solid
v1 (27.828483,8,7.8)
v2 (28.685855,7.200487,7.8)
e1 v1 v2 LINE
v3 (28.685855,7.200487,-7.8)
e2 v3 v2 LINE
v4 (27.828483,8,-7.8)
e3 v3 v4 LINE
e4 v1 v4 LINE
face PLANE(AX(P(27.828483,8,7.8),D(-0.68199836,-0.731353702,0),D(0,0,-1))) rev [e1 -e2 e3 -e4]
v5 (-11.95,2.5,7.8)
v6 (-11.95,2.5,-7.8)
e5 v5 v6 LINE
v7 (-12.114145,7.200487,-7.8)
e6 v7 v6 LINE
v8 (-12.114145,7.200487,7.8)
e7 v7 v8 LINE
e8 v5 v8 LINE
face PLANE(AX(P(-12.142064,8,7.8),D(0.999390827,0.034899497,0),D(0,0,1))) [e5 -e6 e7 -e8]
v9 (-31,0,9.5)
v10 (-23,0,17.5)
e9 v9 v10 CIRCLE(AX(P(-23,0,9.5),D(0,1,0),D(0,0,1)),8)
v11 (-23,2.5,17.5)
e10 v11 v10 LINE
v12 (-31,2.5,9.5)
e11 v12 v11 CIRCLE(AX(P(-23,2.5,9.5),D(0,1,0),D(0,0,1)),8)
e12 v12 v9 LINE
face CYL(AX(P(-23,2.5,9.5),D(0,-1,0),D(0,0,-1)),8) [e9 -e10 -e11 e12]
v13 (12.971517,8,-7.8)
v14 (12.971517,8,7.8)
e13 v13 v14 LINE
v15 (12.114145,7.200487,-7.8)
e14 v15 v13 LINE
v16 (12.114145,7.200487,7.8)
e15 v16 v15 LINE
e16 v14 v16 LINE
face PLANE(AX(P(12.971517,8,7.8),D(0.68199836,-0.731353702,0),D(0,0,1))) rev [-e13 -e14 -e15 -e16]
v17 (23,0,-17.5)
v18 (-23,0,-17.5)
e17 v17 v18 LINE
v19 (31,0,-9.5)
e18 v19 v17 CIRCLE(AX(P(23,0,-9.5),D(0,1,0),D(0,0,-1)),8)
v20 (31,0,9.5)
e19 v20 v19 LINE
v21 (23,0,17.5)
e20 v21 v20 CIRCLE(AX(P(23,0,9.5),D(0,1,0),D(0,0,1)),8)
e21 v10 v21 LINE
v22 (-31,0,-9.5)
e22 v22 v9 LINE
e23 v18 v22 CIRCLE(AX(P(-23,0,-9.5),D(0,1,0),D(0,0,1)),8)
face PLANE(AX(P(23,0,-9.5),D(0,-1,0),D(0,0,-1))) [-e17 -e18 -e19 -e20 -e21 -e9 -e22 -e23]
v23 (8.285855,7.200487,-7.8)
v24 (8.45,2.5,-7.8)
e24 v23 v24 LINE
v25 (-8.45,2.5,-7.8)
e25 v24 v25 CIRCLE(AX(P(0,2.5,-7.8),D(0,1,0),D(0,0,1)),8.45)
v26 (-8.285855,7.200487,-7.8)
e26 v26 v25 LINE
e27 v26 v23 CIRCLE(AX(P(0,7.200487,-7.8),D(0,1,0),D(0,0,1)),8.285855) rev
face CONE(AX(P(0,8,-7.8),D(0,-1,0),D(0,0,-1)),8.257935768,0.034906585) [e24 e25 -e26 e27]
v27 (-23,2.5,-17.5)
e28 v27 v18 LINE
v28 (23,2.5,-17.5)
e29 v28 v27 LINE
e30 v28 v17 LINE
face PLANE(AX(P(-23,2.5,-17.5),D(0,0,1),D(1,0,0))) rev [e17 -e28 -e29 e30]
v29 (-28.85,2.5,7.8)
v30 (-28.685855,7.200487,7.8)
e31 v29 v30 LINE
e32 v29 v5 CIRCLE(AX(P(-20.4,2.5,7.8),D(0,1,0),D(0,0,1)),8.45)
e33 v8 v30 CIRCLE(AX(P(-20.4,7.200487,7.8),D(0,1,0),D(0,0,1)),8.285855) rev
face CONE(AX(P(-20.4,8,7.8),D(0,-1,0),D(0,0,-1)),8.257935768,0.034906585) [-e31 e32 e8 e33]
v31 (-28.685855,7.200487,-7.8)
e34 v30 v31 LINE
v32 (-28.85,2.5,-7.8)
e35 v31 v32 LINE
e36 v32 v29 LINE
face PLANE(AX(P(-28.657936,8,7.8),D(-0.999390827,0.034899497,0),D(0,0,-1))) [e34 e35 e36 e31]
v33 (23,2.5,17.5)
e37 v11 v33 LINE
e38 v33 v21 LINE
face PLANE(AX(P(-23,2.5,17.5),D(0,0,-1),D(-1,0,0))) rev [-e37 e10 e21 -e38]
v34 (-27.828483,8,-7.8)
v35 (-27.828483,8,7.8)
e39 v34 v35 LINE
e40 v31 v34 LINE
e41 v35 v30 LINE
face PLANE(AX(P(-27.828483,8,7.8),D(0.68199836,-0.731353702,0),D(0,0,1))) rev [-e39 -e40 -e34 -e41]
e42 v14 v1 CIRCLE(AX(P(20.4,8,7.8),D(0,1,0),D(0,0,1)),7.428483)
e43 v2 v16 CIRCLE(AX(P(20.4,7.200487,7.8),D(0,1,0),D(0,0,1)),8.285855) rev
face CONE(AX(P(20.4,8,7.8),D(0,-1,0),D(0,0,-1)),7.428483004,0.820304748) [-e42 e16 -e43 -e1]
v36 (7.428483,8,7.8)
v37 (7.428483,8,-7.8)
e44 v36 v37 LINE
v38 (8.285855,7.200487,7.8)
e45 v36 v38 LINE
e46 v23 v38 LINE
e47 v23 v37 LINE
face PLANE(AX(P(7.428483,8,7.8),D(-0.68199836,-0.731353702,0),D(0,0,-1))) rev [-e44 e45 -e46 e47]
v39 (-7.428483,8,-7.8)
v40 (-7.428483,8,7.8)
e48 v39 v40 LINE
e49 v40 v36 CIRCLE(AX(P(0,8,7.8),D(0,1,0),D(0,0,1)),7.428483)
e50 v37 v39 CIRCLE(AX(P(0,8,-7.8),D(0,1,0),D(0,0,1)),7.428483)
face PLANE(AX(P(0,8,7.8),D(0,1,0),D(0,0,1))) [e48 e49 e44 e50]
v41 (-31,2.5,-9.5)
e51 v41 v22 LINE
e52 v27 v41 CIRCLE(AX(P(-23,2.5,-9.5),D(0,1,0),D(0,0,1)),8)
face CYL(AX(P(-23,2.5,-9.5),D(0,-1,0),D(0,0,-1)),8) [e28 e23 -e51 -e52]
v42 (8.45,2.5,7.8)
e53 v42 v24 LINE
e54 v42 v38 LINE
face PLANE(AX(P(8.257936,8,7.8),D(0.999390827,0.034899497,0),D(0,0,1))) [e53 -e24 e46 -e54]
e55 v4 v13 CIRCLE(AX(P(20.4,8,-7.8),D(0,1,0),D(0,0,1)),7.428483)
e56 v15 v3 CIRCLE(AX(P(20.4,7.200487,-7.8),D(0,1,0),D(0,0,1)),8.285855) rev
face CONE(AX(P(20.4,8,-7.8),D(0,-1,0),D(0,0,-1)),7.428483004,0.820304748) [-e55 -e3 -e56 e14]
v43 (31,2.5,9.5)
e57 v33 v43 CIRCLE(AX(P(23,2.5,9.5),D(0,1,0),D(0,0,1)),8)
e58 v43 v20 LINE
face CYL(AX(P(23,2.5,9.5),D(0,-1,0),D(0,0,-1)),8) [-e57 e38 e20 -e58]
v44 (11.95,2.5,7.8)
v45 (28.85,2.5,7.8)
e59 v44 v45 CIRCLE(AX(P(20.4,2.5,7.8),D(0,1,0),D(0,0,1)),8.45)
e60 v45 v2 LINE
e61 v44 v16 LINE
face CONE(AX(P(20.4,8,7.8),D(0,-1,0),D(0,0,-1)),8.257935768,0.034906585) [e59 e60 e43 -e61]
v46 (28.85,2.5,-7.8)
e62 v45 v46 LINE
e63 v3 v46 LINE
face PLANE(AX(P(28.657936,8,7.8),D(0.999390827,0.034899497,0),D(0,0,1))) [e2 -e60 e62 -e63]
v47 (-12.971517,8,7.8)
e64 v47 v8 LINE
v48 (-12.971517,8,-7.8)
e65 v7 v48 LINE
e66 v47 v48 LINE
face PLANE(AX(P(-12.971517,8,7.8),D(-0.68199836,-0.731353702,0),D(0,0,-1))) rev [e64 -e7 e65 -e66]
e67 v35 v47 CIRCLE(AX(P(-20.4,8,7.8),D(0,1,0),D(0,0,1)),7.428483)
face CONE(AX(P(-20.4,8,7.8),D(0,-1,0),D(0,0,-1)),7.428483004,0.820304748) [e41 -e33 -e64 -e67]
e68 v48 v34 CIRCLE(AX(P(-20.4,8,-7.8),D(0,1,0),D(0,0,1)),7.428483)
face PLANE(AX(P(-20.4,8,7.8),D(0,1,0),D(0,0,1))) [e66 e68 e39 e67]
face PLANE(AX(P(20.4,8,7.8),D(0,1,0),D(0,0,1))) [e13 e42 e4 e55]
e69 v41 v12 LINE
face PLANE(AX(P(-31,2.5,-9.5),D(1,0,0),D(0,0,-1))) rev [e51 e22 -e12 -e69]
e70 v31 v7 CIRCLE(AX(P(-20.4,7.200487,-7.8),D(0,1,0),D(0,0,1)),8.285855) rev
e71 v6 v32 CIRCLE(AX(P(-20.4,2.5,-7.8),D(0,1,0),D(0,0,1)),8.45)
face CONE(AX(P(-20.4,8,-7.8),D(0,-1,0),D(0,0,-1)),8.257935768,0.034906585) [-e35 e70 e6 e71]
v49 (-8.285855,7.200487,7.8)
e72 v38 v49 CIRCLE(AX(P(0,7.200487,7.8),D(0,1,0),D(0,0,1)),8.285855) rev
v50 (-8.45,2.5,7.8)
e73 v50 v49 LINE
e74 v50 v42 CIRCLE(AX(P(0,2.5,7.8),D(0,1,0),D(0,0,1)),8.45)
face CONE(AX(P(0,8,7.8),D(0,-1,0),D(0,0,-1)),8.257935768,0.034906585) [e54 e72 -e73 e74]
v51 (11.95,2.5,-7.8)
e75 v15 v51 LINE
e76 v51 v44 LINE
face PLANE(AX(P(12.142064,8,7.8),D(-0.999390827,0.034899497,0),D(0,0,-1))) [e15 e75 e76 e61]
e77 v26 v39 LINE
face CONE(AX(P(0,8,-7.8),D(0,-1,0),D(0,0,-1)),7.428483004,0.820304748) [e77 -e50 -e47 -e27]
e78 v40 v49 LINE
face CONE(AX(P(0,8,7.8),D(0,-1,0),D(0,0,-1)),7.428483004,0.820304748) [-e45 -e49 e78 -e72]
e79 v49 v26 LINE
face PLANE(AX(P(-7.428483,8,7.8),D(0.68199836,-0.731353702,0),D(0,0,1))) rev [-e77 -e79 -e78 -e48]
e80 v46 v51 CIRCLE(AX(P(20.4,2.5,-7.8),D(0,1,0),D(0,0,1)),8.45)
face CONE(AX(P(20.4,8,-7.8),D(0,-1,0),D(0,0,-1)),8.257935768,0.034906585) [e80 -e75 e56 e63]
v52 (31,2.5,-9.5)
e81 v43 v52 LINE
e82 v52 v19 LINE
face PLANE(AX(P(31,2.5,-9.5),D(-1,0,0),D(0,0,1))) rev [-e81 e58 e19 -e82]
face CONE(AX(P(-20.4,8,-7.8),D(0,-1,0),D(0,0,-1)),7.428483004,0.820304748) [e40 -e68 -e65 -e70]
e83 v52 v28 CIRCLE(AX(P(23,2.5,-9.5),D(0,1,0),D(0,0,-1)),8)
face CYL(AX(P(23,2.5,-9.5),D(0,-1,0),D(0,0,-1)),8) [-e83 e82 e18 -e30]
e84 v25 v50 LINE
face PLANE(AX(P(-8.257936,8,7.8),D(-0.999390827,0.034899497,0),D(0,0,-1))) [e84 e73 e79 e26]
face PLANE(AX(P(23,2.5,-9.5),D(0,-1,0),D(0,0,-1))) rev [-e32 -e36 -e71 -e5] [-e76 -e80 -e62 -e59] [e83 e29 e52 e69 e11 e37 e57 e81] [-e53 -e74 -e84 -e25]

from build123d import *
from OCP.BRepFilletAPI import BRepFilletAPI_MakeChamfer

# Parameters (mm, degrees)
BOSS_EXTRUDE1_DEPTH = 2.5
BOSS_EXTRUDE2_DEPTH = 5.5
CHAMFER2_SIZE       = 5.5
CHAMFER2_SIZE_2     = 0.192064232
CHAMFER3_SIZE       = 0.8
CHAMFER3_SIZE2      = 0.829452764


with BuildPart() as part:
    # Sketch1 → Boss-Extrude1 (new body)
    with BuildSketch(Plane(origin=(0, 0, 0), x_dir=(1, 0, 0), z_dir=(0, 1, 0))):
        with BuildLine():
            Line((-23, 17.5), (23, 17.5))
            ThreePointArc((23, 17.5), (28.656854249, 15.156854249), (31, 9.5))
            Line((31, 9.5), (31, -9.5))
            ThreePointArc((31, -9.5), (28.656854249, -15.156854249), (23, -17.5))
            Line((23, -17.5), (-23, -17.5))
            ThreePointArc((-23, -17.5), (-28.656854249, -15.156854249), (-31, -9.5))
            Line((-31, -9.5), (-31, 9.5))
            ThreePointArc((-31, 9.5), (-28.656854249, 15.156854249), (-23, 17.5))
        make_face()
    extrude(amount=BOSS_EXTRUDE1_DEPTH)

    # Sketch2 → Boss-Extrude2 (add)
    with BuildSketch(Plane(origin=(0, 2.5, 0), x_dir=(1, 0, 0), z_dir=(0, 1, 0))):
        with BuildLine():
            Line((-28.85, -7.8), (-28.85, 7.8))
            ThreePointArc((-28.85, 7.8), (-20.4, 16.25), (-11.95, 7.8))
            Line((-11.95, 7.8), (-11.95, -7.8))
            ThreePointArc((-11.95, -7.8), (-20.4, -16.25), (-28.85, -7.8))
        make_face()
        with BuildLine():
            Line((-8.45, -7.8), (-8.45, 7.8))
            ThreePointArc((-8.45, 7.8), (0, 16.25), (8.45, 7.8))
            Line((8.45, 7.8), (8.45, -7.8))
            ThreePointArc((8.45, -7.8), (0, -16.25), (-8.45, -7.8))
        make_face()
        with BuildLine():
            Line((11.95, -7.8), (11.95, 7.8))
            ThreePointArc((11.95, 7.8), (20.4, 16.25), (28.85, 7.8))
            Line((28.85, 7.8), (28.85, -7.8))
            ThreePointArc((28.85, -7.8), (20.4, -16.25), (11.95, -7.8))
        make_face()
    extrude(amount=BOSS_EXTRUDE2_DEPTH)

    # Chamfer2
    # the kernel refuses this chamfer: 5.5, 0.192064232 mm, written as the material it takes off along each edge
    with BuildSketch(Plane(origin=(-28.85, 8, 7.8), x_dir=(-0.0013423185755924486, -0.9999990990900149, 0), z_dir=(0, 0, -1))) as chamfer2_piece_1_section:
        Polygon((CHAMFER2_SIZE * 0.99999909909, -CHAMFER2_SIZE * 0.00134231857559), (-CHAMFER2_SIZE_2 * 0.00134231857702, -CHAMFER2_SIZE_2 * 0.999999100155), (0, 0), align=None)
    chamfer2_piece_1 = extrude(amount=15.6, mode=Mode.PRIVATE)
    chamfer2_piece_1 = split(chamfer2_piece_1, bisect_by=Plane(origin=(-28.848299171, 2.5, 0), z_dir=(0, 1, 0)), keep=Keep.TOP, mode=Mode.PRIVATE)
    add(chamfer2_piece_1, mode=Mode.SUBTRACT)
    with BuildSketch(Plane(origin=(-20.4, 8, -7.8), x_dir=(-1, 0, 0), z_dir=(0, 0, 1))) as chamfer2_piece_2_section:
        Polygon((8.45, CHAMFER2_SIZE), (8.45 - CHAMFER2_SIZE_2 * 1.00000000107, 0), (8.45, 0), align=None)
    chamfer2_piece_2 = revolve(axis=Axis((-20.4, 8, -7.8), (0, -1, 0)), revolution_arc=180, mode=Mode.PRIVATE)
    chamfer2_piece_2 = split(chamfer2_piece_2, bisect_by=Plane(origin=(-20.4, 2.5, -16.18152008), z_dir=(0, 1, 0)), keep=Keep.TOP, mode=Mode.PRIVATE)
    add(chamfer2_piece_2, mode=Mode.SUBTRACT)
    with BuildSketch(Plane(origin=(-11.95, 8, -7.8), x_dir=(0.0013423185755924486, -0.9999990990900149, 0), z_dir=(0, 0, 1))) as chamfer2_piece_3_section:
        Polygon((CHAMFER2_SIZE * 0.99999909909, -CHAMFER2_SIZE * 0.00134231857559), (-CHAMFER2_SIZE_2 * 0.00134231857702, -CHAMFER2_SIZE_2 * 0.999999100155), (0, 0), align=None)
    chamfer2_piece_3 = extrude(amount=15.6, mode=Mode.PRIVATE)
    chamfer2_piece_3 = split(chamfer2_piece_3, bisect_by=Plane(origin=(-11.951700829, 2.5, 0), z_dir=(0, 1, 0)), keep=Keep.TOP, mode=Mode.PRIVATE)
    add(chamfer2_piece_3, mode=Mode.SUBTRACT)
    with BuildSketch(Plane(origin=(-20.4, 8, 7.8), x_dir=(1, 0, 0), z_dir=(0, 0, -1))) as chamfer2_piece_4_section:
        Polygon((8.45, CHAMFER2_SIZE), (8.45 - CHAMFER2_SIZE_2 * 1.00000000107, 0), (8.45, 0), align=None)
    chamfer2_piece_4 = revolve(axis=Axis((-20.4, 8, 7.8), (0, -1, 0)), revolution_arc=180, mode=Mode.PRIVATE)
    chamfer2_piece_4 = split(chamfer2_piece_4, bisect_by=Plane(origin=(-20.4, 2.5, 16.18152008), z_dir=(0, 1, 0)), keep=Keep.TOP, mode=Mode.PRIVATE)
    add(chamfer2_piece_4, mode=Mode.SUBTRACT)
    with BuildSketch(Plane(origin=(-8.45, 8, 7.8), x_dir=(-0.0013423185755924486, -0.9999990990900149, 0), z_dir=(0, 0, -1))) as chamfer2_piece_5_section:
        Polygon((CHAMFER2_SIZE * 0.99999909909, -CHAMFER2_SIZE * 0.00134231857559), (-CHAMFER2_SIZE_2 * 0.00134231857702, -CHAMFER2_SIZE_2 * 0.999999100155), (0, 0), align=None)
    chamfer2_piece_5 = extrude(amount=15.6, mode=Mode.PRIVATE)
    chamfer2_piece_5 = split(chamfer2_piece_5, bisect_by=Plane(origin=(-8.448299171, 2.5, 0), z_dir=(0, 1, 0)), keep=Keep.TOP, mode=Mode.PRIVATE)
    add(chamfer2_piece_5, mode=Mode.SUBTRACT)
    with BuildSketch(Plane(origin=(0, 8, -7.8), x_dir=(-1, 0, 0), z_dir=(0, 0, 1))) as chamfer2_piece_6_section:
        Polygon((8.45, CHAMFER2_SIZE), (8.45 - CHAMFER2_SIZE_2 * 1.00000000107, 0), (8.45, 0), align=None)
    chamfer2_piece_6 = revolve(axis=Axis((0, 8, -7.8), (0, -1, 0)), revolution_arc=180, mode=Mode.PRIVATE)
    chamfer2_piece_6 = split(chamfer2_piece_6, bisect_by=Plane(origin=(0, 2.5, -16.18152008), z_dir=(0, 1, 0)), keep=Keep.TOP, mode=Mode.PRIVATE)
    add(chamfer2_piece_6, mode=Mode.SUBTRACT)
    with BuildSketch(Plane(origin=(8.45, 8, -7.8), x_dir=(0.0013423185755924486, -0.9999990990900149, 0), z_dir=(0, 0, 1))) as chamfer2_piece_7_section:
        Polygon((CHAMFER2_SIZE * 0.99999909909, -CHAMFER2_SIZE * 0.00134231857559), (-CHAMFER2_SIZE_2 * 0.00134231857702, -CHAMFER2_SIZE_2 * 0.999999100155), (0, 0), align=None)
    chamfer2_piece_7 = extrude(amount=15.6, mode=Mode.PRIVATE)
    chamfer2_piece_7 = split(chamfer2_piece_7, bisect_by=Plane(origin=(8.448299171, 2.5, 0), z_dir=(0, 1, 0)), keep=Keep.TOP, mode=Mode.PRIVATE)
    add(chamfer2_piece_7, mode=Mode.SUBTRACT)
    with BuildSketch(Plane(origin=(0, 8, 7.8), x_dir=(1, 0, 0), z_dir=(0, 0, -1))) as chamfer2_piece_8_section:
        Polygon((8.45, CHAMFER2_SIZE), (8.45 - CHAMFER2_SIZE_2 * 1.00000000107, 0), (8.45, 0), align=None)
    chamfer2_piece_8 = revolve(axis=Axis((0, 8, 7.8), (0, -1, 0)), revolution_arc=180, mode=Mode.PRIVATE)
    chamfer2_piece_8 = split(chamfer2_piece_8, bisect_by=Plane(origin=(0, 2.5, 16.18152008), z_dir=(0, 1, 0)), keep=Keep.TOP, mode=Mode.PRIVATE)
    add(chamfer2_piece_8, mode=Mode.SUBTRACT)
    with BuildSketch(Plane(origin=(11.95, 8, 7.8), x_dir=(-0.0013423185755924486, -0.9999990990900149, 0), z_dir=(0, 0, -1))) as chamfer2_piece_9_section:
        Polygon((CHAMFER2_SIZE * 0.99999909909, -CHAMFER2_SIZE * 0.00134231857559), (-CHAMFER2_SIZE_2 * 0.00134231857702, -CHAMFER2_SIZE_2 * 0.999999100155), (0, 0), align=None)
    chamfer2_piece_9 = extrude(amount=15.6, mode=Mode.PRIVATE)
    chamfer2_piece_9 = split(chamfer2_piece_9, bisect_by=Plane(origin=(11.951700829, 2.5, 0), z_dir=(0, 1, 0)), keep=Keep.TOP, mode=Mode.PRIVATE)
    add(chamfer2_piece_9, mode=Mode.SUBTRACT)
    with BuildSketch(Plane(origin=(20.4, 8, -7.8), x_dir=(-1, 0, 0), z_dir=(0, 0, 1))) as chamfer2_piece_10_section:
        Polygon((8.45, CHAMFER2_SIZE), (8.45 - CHAMFER2_SIZE_2 * 1.00000000107, 0), (8.45, 0), align=None)
    chamfer2_piece_10 = revolve(axis=Axis((20.4, 8, -7.8), (0, -1, 0)), revolution_arc=180, mode=Mode.PRIVATE)
    chamfer2_piece_10 = split(chamfer2_piece_10, bisect_by=Plane(origin=(20.4, 2.5, -16.18152008), z_dir=(0, 1, 0)), keep=Keep.TOP, mode=Mode.PRIVATE)
    add(chamfer2_piece_10, mode=Mode.SUBTRACT)
    with BuildSketch(Plane(origin=(28.85, 8, -7.8), x_dir=(0.0013423185755924486, -0.9999990990900149, 0), z_dir=(0, 0, 1))) as chamfer2_piece_11_section:
        Polygon((CHAMFER2_SIZE * 0.99999909909, -CHAMFER2_SIZE * 0.00134231857559), (-CHAMFER2_SIZE_2 * 0.00134231857702, -CHAMFER2_SIZE_2 * 0.999999100155), (0, 0), align=None)
    chamfer2_piece_11 = extrude(amount=15.6, mode=Mode.PRIVATE)
    chamfer2_piece_11 = split(chamfer2_piece_11, bisect_by=Plane(origin=(28.848299171, 2.5, 0), z_dir=(0, 1, 0)), keep=Keep.TOP, mode=Mode.PRIVATE)
    add(chamfer2_piece_11, mode=Mode.SUBTRACT)
    with BuildSketch(Plane(origin=(20.4, 8, 7.8), x_dir=(1, 0, 0), z_dir=(0, 0, -1))) as chamfer2_piece_12_section:
        Polygon((8.45, CHAMFER2_SIZE), (8.45 - CHAMFER2_SIZE_2 * 1.00000000107, 0), (8.45, 0), align=None)
    chamfer2_piece_12 = revolve(axis=Axis((20.4, 8, 7.8), (0, -1, 0)), revolution_arc=180, mode=Mode.PRIVATE)
    chamfer2_piece_12 = split(chamfer2_piece_12, bisect_by=Plane(origin=(20.4, 2.5, 16.18152008), z_dir=(0, 1, 0)), keep=Keep.TOP, mode=Mode.PRIVATE)
    add(chamfer2_piece_12, mode=Mode.SUBTRACT)

    # Chamfer3: one chamfer whose edges measure the first distance from different faces: ONE call of the kernel's chamfer builder (chamfer() names one face for all edges)
    chamfer3_edges_1 = [part.edges().sort_by_distance(p)[0] for p in [
        (-20.4, 8, 16.057935768),
    ]]
    chamfer3_side_1 = [part.faces().sort_by_distance(p)[0] for p in [
        (-20.4, 5.25, 16.153967884),
    ]]
    chamfer3_edges_2 = [part.edges().sort_by_distance(p)[0] for p in [
        (-12.142064232, 8, 0),
    ]]
    chamfer3_side_2 = [part.faces().sort_by_distance(p)[0] for p in [
        (-12.046032116, 5.25, 0),
    ]]
    chamfer3_edges_3 = [part.edges().sort_by_distance(p)[0] for p in [
        (-20.4, 8, -16.057935768),
    ]]
    chamfer3_side_3 = [part.faces().sort_by_distance(p)[0] for p in [
        (-20.4, 5.25, -16.153967884),
    ]]
    chamfer3_edges_4 = [part.edges().sort_by_distance(p)[0] for p in [
        (-28.657935768, 8, 0),
    ]]
    chamfer3_side_4 = [part.faces().sort_by_distance(p)[0] for p in [
        (-28.753967884, 5.25, 0),
    ]]
    chamfer3_edges_5 = [part.edges().sort_by_distance(p)[0] for p in [
        (0, 8, 16.057935768),
    ]]
    chamfer3_side_5 = [part.faces().sort_by_distance(p)[0] for p in [
        (0, 5.25, 16.153967884),
    ]]
    chamfer3_edges_6 = [part.edges().sort_by_distance(p)[0] for p in [
        (8.257935768, 8, 0),
    ]]
    chamfer3_side_6 = [part.faces().sort_by_distance(p)[0] for p in [
        (8.353967884, 5.25, 0),
    ]]
    chamfer3_edges_7 = [part.edges().sort_by_distance(p)[0] for p in [
        (0, 8, -16.057935768),
    ]]
    chamfer3_side_7 = [part.faces().sort_by_distance(p)[0] for p in [
        (0, 5.25, -16.153967884),
    ]]
    chamfer3_edges_8 = [part.edges().sort_by_distance(p)[0] for p in [
        (-8.257935768, 8, 0),
    ]]
    chamfer3_side_8 = [part.faces().sort_by_distance(p)[0] for p in [
        (-8.353967884, 5.25, 0),
    ]]
    chamfer3_edges_9 = [part.edges().sort_by_distance(p)[0] for p in [
        (20.4, 8, 16.057935768),
    ]]
    chamfer3_side_9 = [part.faces().sort_by_distance(p)[0] for p in [
        (20.4, 5.25, 16.153967884),
    ]]
    chamfer3_edges_10 = [part.edges().sort_by_distance(p)[0] for p in [
        (28.657935768, 8, 0),
    ]]
    chamfer3_side_10 = [part.faces().sort_by_distance(p)[0] for p in [
        (28.753967884, 5.25, 0),
    ]]
    chamfer3_edges_11 = [part.edges().sort_by_distance(p)[0] for p in [
        (20.4, 8, -16.057935768),
    ]]
    chamfer3_side_11 = [part.faces().sort_by_distance(p)[0] for p in [
        (20.4, 5.25, -16.153967884),
    ]]
    chamfer3_edges_12 = [part.edges().sort_by_distance(p)[0] for p in [
        (12.142064232, 8, 0),
    ]]
    chamfer3_side_12 = [part.faces().sort_by_distance(p)[0] for p in [
        (12.046032116, 5.25, 0),
    ]]
    chamfer3 = BRepFilletAPI_MakeChamfer(part.part.solid().wrapped)
    for e in chamfer3_edges_1:
        chamfer3.Add(CHAMFER3_SIZE, CHAMFER3_SIZE2, e.wrapped, chamfer3_side_1[0].wrapped)  # the first distance lies on this face
    for e in chamfer3_edges_2:
        chamfer3.Add(CHAMFER3_SIZE, CHAMFER3_SIZE2, e.wrapped, chamfer3_side_2[0].wrapped)  # the first distance lies on this face
    for e in chamfer3_edges_3:
        chamfer3.Add(CHAMFER3_SIZE, CHAMFER3_SIZE2, e.wrapped, chamfer3_side_3[0].wrapped)  # the first distance lies on this face
    for e in chamfer3_edges_4:
        chamfer3.Add(CHAMFER3_SIZE, CHAMFER3_SIZE2, e.wrapped, chamfer3_side_4[0].wrapped)  # the first distance lies on this face
    for e in chamfer3_edges_5:
        chamfer3.Add(CHAMFER3_SIZE, CHAMFER3_SIZE2, e.wrapped, chamfer3_side_5[0].wrapped)  # the first distance lies on this face
    for e in chamfer3_edges_6:
        chamfer3.Add(CHAMFER3_SIZE, CHAMFER3_SIZE2, e.wrapped, chamfer3_side_6[0].wrapped)  # the first distance lies on this face
    for e in chamfer3_edges_7:
        chamfer3.Add(CHAMFER3_SIZE, CHAMFER3_SIZE2, e.wrapped, chamfer3_side_7[0].wrapped)  # the first distance lies on this face
    for e in chamfer3_edges_8:
        chamfer3.Add(CHAMFER3_SIZE, CHAMFER3_SIZE2, e.wrapped, chamfer3_side_8[0].wrapped)  # the first distance lies on this face
    for e in chamfer3_edges_9:
        chamfer3.Add(CHAMFER3_SIZE, CHAMFER3_SIZE2, e.wrapped, chamfer3_side_9[0].wrapped)  # the first distance lies on this face
    for e in chamfer3_edges_10:
        chamfer3.Add(CHAMFER3_SIZE, CHAMFER3_SIZE2, e.wrapped, chamfer3_side_10[0].wrapped)  # the first distance lies on this face
    for e in chamfer3_edges_11:
        chamfer3.Add(CHAMFER3_SIZE, CHAMFER3_SIZE2, e.wrapped, chamfer3_side_11[0].wrapped)  # the first distance lies on this face
    for e in chamfer3_edges_12:
        chamfer3.Add(CHAMFER3_SIZE, CHAMFER3_SIZE2, e.wrapped, chamfer3_side_12[0].wrapped)  # the first distance lies on this face
    add(Compound.cast(chamfer3.Shape()), mode=Mode.REPLACE)


solid = part.part
